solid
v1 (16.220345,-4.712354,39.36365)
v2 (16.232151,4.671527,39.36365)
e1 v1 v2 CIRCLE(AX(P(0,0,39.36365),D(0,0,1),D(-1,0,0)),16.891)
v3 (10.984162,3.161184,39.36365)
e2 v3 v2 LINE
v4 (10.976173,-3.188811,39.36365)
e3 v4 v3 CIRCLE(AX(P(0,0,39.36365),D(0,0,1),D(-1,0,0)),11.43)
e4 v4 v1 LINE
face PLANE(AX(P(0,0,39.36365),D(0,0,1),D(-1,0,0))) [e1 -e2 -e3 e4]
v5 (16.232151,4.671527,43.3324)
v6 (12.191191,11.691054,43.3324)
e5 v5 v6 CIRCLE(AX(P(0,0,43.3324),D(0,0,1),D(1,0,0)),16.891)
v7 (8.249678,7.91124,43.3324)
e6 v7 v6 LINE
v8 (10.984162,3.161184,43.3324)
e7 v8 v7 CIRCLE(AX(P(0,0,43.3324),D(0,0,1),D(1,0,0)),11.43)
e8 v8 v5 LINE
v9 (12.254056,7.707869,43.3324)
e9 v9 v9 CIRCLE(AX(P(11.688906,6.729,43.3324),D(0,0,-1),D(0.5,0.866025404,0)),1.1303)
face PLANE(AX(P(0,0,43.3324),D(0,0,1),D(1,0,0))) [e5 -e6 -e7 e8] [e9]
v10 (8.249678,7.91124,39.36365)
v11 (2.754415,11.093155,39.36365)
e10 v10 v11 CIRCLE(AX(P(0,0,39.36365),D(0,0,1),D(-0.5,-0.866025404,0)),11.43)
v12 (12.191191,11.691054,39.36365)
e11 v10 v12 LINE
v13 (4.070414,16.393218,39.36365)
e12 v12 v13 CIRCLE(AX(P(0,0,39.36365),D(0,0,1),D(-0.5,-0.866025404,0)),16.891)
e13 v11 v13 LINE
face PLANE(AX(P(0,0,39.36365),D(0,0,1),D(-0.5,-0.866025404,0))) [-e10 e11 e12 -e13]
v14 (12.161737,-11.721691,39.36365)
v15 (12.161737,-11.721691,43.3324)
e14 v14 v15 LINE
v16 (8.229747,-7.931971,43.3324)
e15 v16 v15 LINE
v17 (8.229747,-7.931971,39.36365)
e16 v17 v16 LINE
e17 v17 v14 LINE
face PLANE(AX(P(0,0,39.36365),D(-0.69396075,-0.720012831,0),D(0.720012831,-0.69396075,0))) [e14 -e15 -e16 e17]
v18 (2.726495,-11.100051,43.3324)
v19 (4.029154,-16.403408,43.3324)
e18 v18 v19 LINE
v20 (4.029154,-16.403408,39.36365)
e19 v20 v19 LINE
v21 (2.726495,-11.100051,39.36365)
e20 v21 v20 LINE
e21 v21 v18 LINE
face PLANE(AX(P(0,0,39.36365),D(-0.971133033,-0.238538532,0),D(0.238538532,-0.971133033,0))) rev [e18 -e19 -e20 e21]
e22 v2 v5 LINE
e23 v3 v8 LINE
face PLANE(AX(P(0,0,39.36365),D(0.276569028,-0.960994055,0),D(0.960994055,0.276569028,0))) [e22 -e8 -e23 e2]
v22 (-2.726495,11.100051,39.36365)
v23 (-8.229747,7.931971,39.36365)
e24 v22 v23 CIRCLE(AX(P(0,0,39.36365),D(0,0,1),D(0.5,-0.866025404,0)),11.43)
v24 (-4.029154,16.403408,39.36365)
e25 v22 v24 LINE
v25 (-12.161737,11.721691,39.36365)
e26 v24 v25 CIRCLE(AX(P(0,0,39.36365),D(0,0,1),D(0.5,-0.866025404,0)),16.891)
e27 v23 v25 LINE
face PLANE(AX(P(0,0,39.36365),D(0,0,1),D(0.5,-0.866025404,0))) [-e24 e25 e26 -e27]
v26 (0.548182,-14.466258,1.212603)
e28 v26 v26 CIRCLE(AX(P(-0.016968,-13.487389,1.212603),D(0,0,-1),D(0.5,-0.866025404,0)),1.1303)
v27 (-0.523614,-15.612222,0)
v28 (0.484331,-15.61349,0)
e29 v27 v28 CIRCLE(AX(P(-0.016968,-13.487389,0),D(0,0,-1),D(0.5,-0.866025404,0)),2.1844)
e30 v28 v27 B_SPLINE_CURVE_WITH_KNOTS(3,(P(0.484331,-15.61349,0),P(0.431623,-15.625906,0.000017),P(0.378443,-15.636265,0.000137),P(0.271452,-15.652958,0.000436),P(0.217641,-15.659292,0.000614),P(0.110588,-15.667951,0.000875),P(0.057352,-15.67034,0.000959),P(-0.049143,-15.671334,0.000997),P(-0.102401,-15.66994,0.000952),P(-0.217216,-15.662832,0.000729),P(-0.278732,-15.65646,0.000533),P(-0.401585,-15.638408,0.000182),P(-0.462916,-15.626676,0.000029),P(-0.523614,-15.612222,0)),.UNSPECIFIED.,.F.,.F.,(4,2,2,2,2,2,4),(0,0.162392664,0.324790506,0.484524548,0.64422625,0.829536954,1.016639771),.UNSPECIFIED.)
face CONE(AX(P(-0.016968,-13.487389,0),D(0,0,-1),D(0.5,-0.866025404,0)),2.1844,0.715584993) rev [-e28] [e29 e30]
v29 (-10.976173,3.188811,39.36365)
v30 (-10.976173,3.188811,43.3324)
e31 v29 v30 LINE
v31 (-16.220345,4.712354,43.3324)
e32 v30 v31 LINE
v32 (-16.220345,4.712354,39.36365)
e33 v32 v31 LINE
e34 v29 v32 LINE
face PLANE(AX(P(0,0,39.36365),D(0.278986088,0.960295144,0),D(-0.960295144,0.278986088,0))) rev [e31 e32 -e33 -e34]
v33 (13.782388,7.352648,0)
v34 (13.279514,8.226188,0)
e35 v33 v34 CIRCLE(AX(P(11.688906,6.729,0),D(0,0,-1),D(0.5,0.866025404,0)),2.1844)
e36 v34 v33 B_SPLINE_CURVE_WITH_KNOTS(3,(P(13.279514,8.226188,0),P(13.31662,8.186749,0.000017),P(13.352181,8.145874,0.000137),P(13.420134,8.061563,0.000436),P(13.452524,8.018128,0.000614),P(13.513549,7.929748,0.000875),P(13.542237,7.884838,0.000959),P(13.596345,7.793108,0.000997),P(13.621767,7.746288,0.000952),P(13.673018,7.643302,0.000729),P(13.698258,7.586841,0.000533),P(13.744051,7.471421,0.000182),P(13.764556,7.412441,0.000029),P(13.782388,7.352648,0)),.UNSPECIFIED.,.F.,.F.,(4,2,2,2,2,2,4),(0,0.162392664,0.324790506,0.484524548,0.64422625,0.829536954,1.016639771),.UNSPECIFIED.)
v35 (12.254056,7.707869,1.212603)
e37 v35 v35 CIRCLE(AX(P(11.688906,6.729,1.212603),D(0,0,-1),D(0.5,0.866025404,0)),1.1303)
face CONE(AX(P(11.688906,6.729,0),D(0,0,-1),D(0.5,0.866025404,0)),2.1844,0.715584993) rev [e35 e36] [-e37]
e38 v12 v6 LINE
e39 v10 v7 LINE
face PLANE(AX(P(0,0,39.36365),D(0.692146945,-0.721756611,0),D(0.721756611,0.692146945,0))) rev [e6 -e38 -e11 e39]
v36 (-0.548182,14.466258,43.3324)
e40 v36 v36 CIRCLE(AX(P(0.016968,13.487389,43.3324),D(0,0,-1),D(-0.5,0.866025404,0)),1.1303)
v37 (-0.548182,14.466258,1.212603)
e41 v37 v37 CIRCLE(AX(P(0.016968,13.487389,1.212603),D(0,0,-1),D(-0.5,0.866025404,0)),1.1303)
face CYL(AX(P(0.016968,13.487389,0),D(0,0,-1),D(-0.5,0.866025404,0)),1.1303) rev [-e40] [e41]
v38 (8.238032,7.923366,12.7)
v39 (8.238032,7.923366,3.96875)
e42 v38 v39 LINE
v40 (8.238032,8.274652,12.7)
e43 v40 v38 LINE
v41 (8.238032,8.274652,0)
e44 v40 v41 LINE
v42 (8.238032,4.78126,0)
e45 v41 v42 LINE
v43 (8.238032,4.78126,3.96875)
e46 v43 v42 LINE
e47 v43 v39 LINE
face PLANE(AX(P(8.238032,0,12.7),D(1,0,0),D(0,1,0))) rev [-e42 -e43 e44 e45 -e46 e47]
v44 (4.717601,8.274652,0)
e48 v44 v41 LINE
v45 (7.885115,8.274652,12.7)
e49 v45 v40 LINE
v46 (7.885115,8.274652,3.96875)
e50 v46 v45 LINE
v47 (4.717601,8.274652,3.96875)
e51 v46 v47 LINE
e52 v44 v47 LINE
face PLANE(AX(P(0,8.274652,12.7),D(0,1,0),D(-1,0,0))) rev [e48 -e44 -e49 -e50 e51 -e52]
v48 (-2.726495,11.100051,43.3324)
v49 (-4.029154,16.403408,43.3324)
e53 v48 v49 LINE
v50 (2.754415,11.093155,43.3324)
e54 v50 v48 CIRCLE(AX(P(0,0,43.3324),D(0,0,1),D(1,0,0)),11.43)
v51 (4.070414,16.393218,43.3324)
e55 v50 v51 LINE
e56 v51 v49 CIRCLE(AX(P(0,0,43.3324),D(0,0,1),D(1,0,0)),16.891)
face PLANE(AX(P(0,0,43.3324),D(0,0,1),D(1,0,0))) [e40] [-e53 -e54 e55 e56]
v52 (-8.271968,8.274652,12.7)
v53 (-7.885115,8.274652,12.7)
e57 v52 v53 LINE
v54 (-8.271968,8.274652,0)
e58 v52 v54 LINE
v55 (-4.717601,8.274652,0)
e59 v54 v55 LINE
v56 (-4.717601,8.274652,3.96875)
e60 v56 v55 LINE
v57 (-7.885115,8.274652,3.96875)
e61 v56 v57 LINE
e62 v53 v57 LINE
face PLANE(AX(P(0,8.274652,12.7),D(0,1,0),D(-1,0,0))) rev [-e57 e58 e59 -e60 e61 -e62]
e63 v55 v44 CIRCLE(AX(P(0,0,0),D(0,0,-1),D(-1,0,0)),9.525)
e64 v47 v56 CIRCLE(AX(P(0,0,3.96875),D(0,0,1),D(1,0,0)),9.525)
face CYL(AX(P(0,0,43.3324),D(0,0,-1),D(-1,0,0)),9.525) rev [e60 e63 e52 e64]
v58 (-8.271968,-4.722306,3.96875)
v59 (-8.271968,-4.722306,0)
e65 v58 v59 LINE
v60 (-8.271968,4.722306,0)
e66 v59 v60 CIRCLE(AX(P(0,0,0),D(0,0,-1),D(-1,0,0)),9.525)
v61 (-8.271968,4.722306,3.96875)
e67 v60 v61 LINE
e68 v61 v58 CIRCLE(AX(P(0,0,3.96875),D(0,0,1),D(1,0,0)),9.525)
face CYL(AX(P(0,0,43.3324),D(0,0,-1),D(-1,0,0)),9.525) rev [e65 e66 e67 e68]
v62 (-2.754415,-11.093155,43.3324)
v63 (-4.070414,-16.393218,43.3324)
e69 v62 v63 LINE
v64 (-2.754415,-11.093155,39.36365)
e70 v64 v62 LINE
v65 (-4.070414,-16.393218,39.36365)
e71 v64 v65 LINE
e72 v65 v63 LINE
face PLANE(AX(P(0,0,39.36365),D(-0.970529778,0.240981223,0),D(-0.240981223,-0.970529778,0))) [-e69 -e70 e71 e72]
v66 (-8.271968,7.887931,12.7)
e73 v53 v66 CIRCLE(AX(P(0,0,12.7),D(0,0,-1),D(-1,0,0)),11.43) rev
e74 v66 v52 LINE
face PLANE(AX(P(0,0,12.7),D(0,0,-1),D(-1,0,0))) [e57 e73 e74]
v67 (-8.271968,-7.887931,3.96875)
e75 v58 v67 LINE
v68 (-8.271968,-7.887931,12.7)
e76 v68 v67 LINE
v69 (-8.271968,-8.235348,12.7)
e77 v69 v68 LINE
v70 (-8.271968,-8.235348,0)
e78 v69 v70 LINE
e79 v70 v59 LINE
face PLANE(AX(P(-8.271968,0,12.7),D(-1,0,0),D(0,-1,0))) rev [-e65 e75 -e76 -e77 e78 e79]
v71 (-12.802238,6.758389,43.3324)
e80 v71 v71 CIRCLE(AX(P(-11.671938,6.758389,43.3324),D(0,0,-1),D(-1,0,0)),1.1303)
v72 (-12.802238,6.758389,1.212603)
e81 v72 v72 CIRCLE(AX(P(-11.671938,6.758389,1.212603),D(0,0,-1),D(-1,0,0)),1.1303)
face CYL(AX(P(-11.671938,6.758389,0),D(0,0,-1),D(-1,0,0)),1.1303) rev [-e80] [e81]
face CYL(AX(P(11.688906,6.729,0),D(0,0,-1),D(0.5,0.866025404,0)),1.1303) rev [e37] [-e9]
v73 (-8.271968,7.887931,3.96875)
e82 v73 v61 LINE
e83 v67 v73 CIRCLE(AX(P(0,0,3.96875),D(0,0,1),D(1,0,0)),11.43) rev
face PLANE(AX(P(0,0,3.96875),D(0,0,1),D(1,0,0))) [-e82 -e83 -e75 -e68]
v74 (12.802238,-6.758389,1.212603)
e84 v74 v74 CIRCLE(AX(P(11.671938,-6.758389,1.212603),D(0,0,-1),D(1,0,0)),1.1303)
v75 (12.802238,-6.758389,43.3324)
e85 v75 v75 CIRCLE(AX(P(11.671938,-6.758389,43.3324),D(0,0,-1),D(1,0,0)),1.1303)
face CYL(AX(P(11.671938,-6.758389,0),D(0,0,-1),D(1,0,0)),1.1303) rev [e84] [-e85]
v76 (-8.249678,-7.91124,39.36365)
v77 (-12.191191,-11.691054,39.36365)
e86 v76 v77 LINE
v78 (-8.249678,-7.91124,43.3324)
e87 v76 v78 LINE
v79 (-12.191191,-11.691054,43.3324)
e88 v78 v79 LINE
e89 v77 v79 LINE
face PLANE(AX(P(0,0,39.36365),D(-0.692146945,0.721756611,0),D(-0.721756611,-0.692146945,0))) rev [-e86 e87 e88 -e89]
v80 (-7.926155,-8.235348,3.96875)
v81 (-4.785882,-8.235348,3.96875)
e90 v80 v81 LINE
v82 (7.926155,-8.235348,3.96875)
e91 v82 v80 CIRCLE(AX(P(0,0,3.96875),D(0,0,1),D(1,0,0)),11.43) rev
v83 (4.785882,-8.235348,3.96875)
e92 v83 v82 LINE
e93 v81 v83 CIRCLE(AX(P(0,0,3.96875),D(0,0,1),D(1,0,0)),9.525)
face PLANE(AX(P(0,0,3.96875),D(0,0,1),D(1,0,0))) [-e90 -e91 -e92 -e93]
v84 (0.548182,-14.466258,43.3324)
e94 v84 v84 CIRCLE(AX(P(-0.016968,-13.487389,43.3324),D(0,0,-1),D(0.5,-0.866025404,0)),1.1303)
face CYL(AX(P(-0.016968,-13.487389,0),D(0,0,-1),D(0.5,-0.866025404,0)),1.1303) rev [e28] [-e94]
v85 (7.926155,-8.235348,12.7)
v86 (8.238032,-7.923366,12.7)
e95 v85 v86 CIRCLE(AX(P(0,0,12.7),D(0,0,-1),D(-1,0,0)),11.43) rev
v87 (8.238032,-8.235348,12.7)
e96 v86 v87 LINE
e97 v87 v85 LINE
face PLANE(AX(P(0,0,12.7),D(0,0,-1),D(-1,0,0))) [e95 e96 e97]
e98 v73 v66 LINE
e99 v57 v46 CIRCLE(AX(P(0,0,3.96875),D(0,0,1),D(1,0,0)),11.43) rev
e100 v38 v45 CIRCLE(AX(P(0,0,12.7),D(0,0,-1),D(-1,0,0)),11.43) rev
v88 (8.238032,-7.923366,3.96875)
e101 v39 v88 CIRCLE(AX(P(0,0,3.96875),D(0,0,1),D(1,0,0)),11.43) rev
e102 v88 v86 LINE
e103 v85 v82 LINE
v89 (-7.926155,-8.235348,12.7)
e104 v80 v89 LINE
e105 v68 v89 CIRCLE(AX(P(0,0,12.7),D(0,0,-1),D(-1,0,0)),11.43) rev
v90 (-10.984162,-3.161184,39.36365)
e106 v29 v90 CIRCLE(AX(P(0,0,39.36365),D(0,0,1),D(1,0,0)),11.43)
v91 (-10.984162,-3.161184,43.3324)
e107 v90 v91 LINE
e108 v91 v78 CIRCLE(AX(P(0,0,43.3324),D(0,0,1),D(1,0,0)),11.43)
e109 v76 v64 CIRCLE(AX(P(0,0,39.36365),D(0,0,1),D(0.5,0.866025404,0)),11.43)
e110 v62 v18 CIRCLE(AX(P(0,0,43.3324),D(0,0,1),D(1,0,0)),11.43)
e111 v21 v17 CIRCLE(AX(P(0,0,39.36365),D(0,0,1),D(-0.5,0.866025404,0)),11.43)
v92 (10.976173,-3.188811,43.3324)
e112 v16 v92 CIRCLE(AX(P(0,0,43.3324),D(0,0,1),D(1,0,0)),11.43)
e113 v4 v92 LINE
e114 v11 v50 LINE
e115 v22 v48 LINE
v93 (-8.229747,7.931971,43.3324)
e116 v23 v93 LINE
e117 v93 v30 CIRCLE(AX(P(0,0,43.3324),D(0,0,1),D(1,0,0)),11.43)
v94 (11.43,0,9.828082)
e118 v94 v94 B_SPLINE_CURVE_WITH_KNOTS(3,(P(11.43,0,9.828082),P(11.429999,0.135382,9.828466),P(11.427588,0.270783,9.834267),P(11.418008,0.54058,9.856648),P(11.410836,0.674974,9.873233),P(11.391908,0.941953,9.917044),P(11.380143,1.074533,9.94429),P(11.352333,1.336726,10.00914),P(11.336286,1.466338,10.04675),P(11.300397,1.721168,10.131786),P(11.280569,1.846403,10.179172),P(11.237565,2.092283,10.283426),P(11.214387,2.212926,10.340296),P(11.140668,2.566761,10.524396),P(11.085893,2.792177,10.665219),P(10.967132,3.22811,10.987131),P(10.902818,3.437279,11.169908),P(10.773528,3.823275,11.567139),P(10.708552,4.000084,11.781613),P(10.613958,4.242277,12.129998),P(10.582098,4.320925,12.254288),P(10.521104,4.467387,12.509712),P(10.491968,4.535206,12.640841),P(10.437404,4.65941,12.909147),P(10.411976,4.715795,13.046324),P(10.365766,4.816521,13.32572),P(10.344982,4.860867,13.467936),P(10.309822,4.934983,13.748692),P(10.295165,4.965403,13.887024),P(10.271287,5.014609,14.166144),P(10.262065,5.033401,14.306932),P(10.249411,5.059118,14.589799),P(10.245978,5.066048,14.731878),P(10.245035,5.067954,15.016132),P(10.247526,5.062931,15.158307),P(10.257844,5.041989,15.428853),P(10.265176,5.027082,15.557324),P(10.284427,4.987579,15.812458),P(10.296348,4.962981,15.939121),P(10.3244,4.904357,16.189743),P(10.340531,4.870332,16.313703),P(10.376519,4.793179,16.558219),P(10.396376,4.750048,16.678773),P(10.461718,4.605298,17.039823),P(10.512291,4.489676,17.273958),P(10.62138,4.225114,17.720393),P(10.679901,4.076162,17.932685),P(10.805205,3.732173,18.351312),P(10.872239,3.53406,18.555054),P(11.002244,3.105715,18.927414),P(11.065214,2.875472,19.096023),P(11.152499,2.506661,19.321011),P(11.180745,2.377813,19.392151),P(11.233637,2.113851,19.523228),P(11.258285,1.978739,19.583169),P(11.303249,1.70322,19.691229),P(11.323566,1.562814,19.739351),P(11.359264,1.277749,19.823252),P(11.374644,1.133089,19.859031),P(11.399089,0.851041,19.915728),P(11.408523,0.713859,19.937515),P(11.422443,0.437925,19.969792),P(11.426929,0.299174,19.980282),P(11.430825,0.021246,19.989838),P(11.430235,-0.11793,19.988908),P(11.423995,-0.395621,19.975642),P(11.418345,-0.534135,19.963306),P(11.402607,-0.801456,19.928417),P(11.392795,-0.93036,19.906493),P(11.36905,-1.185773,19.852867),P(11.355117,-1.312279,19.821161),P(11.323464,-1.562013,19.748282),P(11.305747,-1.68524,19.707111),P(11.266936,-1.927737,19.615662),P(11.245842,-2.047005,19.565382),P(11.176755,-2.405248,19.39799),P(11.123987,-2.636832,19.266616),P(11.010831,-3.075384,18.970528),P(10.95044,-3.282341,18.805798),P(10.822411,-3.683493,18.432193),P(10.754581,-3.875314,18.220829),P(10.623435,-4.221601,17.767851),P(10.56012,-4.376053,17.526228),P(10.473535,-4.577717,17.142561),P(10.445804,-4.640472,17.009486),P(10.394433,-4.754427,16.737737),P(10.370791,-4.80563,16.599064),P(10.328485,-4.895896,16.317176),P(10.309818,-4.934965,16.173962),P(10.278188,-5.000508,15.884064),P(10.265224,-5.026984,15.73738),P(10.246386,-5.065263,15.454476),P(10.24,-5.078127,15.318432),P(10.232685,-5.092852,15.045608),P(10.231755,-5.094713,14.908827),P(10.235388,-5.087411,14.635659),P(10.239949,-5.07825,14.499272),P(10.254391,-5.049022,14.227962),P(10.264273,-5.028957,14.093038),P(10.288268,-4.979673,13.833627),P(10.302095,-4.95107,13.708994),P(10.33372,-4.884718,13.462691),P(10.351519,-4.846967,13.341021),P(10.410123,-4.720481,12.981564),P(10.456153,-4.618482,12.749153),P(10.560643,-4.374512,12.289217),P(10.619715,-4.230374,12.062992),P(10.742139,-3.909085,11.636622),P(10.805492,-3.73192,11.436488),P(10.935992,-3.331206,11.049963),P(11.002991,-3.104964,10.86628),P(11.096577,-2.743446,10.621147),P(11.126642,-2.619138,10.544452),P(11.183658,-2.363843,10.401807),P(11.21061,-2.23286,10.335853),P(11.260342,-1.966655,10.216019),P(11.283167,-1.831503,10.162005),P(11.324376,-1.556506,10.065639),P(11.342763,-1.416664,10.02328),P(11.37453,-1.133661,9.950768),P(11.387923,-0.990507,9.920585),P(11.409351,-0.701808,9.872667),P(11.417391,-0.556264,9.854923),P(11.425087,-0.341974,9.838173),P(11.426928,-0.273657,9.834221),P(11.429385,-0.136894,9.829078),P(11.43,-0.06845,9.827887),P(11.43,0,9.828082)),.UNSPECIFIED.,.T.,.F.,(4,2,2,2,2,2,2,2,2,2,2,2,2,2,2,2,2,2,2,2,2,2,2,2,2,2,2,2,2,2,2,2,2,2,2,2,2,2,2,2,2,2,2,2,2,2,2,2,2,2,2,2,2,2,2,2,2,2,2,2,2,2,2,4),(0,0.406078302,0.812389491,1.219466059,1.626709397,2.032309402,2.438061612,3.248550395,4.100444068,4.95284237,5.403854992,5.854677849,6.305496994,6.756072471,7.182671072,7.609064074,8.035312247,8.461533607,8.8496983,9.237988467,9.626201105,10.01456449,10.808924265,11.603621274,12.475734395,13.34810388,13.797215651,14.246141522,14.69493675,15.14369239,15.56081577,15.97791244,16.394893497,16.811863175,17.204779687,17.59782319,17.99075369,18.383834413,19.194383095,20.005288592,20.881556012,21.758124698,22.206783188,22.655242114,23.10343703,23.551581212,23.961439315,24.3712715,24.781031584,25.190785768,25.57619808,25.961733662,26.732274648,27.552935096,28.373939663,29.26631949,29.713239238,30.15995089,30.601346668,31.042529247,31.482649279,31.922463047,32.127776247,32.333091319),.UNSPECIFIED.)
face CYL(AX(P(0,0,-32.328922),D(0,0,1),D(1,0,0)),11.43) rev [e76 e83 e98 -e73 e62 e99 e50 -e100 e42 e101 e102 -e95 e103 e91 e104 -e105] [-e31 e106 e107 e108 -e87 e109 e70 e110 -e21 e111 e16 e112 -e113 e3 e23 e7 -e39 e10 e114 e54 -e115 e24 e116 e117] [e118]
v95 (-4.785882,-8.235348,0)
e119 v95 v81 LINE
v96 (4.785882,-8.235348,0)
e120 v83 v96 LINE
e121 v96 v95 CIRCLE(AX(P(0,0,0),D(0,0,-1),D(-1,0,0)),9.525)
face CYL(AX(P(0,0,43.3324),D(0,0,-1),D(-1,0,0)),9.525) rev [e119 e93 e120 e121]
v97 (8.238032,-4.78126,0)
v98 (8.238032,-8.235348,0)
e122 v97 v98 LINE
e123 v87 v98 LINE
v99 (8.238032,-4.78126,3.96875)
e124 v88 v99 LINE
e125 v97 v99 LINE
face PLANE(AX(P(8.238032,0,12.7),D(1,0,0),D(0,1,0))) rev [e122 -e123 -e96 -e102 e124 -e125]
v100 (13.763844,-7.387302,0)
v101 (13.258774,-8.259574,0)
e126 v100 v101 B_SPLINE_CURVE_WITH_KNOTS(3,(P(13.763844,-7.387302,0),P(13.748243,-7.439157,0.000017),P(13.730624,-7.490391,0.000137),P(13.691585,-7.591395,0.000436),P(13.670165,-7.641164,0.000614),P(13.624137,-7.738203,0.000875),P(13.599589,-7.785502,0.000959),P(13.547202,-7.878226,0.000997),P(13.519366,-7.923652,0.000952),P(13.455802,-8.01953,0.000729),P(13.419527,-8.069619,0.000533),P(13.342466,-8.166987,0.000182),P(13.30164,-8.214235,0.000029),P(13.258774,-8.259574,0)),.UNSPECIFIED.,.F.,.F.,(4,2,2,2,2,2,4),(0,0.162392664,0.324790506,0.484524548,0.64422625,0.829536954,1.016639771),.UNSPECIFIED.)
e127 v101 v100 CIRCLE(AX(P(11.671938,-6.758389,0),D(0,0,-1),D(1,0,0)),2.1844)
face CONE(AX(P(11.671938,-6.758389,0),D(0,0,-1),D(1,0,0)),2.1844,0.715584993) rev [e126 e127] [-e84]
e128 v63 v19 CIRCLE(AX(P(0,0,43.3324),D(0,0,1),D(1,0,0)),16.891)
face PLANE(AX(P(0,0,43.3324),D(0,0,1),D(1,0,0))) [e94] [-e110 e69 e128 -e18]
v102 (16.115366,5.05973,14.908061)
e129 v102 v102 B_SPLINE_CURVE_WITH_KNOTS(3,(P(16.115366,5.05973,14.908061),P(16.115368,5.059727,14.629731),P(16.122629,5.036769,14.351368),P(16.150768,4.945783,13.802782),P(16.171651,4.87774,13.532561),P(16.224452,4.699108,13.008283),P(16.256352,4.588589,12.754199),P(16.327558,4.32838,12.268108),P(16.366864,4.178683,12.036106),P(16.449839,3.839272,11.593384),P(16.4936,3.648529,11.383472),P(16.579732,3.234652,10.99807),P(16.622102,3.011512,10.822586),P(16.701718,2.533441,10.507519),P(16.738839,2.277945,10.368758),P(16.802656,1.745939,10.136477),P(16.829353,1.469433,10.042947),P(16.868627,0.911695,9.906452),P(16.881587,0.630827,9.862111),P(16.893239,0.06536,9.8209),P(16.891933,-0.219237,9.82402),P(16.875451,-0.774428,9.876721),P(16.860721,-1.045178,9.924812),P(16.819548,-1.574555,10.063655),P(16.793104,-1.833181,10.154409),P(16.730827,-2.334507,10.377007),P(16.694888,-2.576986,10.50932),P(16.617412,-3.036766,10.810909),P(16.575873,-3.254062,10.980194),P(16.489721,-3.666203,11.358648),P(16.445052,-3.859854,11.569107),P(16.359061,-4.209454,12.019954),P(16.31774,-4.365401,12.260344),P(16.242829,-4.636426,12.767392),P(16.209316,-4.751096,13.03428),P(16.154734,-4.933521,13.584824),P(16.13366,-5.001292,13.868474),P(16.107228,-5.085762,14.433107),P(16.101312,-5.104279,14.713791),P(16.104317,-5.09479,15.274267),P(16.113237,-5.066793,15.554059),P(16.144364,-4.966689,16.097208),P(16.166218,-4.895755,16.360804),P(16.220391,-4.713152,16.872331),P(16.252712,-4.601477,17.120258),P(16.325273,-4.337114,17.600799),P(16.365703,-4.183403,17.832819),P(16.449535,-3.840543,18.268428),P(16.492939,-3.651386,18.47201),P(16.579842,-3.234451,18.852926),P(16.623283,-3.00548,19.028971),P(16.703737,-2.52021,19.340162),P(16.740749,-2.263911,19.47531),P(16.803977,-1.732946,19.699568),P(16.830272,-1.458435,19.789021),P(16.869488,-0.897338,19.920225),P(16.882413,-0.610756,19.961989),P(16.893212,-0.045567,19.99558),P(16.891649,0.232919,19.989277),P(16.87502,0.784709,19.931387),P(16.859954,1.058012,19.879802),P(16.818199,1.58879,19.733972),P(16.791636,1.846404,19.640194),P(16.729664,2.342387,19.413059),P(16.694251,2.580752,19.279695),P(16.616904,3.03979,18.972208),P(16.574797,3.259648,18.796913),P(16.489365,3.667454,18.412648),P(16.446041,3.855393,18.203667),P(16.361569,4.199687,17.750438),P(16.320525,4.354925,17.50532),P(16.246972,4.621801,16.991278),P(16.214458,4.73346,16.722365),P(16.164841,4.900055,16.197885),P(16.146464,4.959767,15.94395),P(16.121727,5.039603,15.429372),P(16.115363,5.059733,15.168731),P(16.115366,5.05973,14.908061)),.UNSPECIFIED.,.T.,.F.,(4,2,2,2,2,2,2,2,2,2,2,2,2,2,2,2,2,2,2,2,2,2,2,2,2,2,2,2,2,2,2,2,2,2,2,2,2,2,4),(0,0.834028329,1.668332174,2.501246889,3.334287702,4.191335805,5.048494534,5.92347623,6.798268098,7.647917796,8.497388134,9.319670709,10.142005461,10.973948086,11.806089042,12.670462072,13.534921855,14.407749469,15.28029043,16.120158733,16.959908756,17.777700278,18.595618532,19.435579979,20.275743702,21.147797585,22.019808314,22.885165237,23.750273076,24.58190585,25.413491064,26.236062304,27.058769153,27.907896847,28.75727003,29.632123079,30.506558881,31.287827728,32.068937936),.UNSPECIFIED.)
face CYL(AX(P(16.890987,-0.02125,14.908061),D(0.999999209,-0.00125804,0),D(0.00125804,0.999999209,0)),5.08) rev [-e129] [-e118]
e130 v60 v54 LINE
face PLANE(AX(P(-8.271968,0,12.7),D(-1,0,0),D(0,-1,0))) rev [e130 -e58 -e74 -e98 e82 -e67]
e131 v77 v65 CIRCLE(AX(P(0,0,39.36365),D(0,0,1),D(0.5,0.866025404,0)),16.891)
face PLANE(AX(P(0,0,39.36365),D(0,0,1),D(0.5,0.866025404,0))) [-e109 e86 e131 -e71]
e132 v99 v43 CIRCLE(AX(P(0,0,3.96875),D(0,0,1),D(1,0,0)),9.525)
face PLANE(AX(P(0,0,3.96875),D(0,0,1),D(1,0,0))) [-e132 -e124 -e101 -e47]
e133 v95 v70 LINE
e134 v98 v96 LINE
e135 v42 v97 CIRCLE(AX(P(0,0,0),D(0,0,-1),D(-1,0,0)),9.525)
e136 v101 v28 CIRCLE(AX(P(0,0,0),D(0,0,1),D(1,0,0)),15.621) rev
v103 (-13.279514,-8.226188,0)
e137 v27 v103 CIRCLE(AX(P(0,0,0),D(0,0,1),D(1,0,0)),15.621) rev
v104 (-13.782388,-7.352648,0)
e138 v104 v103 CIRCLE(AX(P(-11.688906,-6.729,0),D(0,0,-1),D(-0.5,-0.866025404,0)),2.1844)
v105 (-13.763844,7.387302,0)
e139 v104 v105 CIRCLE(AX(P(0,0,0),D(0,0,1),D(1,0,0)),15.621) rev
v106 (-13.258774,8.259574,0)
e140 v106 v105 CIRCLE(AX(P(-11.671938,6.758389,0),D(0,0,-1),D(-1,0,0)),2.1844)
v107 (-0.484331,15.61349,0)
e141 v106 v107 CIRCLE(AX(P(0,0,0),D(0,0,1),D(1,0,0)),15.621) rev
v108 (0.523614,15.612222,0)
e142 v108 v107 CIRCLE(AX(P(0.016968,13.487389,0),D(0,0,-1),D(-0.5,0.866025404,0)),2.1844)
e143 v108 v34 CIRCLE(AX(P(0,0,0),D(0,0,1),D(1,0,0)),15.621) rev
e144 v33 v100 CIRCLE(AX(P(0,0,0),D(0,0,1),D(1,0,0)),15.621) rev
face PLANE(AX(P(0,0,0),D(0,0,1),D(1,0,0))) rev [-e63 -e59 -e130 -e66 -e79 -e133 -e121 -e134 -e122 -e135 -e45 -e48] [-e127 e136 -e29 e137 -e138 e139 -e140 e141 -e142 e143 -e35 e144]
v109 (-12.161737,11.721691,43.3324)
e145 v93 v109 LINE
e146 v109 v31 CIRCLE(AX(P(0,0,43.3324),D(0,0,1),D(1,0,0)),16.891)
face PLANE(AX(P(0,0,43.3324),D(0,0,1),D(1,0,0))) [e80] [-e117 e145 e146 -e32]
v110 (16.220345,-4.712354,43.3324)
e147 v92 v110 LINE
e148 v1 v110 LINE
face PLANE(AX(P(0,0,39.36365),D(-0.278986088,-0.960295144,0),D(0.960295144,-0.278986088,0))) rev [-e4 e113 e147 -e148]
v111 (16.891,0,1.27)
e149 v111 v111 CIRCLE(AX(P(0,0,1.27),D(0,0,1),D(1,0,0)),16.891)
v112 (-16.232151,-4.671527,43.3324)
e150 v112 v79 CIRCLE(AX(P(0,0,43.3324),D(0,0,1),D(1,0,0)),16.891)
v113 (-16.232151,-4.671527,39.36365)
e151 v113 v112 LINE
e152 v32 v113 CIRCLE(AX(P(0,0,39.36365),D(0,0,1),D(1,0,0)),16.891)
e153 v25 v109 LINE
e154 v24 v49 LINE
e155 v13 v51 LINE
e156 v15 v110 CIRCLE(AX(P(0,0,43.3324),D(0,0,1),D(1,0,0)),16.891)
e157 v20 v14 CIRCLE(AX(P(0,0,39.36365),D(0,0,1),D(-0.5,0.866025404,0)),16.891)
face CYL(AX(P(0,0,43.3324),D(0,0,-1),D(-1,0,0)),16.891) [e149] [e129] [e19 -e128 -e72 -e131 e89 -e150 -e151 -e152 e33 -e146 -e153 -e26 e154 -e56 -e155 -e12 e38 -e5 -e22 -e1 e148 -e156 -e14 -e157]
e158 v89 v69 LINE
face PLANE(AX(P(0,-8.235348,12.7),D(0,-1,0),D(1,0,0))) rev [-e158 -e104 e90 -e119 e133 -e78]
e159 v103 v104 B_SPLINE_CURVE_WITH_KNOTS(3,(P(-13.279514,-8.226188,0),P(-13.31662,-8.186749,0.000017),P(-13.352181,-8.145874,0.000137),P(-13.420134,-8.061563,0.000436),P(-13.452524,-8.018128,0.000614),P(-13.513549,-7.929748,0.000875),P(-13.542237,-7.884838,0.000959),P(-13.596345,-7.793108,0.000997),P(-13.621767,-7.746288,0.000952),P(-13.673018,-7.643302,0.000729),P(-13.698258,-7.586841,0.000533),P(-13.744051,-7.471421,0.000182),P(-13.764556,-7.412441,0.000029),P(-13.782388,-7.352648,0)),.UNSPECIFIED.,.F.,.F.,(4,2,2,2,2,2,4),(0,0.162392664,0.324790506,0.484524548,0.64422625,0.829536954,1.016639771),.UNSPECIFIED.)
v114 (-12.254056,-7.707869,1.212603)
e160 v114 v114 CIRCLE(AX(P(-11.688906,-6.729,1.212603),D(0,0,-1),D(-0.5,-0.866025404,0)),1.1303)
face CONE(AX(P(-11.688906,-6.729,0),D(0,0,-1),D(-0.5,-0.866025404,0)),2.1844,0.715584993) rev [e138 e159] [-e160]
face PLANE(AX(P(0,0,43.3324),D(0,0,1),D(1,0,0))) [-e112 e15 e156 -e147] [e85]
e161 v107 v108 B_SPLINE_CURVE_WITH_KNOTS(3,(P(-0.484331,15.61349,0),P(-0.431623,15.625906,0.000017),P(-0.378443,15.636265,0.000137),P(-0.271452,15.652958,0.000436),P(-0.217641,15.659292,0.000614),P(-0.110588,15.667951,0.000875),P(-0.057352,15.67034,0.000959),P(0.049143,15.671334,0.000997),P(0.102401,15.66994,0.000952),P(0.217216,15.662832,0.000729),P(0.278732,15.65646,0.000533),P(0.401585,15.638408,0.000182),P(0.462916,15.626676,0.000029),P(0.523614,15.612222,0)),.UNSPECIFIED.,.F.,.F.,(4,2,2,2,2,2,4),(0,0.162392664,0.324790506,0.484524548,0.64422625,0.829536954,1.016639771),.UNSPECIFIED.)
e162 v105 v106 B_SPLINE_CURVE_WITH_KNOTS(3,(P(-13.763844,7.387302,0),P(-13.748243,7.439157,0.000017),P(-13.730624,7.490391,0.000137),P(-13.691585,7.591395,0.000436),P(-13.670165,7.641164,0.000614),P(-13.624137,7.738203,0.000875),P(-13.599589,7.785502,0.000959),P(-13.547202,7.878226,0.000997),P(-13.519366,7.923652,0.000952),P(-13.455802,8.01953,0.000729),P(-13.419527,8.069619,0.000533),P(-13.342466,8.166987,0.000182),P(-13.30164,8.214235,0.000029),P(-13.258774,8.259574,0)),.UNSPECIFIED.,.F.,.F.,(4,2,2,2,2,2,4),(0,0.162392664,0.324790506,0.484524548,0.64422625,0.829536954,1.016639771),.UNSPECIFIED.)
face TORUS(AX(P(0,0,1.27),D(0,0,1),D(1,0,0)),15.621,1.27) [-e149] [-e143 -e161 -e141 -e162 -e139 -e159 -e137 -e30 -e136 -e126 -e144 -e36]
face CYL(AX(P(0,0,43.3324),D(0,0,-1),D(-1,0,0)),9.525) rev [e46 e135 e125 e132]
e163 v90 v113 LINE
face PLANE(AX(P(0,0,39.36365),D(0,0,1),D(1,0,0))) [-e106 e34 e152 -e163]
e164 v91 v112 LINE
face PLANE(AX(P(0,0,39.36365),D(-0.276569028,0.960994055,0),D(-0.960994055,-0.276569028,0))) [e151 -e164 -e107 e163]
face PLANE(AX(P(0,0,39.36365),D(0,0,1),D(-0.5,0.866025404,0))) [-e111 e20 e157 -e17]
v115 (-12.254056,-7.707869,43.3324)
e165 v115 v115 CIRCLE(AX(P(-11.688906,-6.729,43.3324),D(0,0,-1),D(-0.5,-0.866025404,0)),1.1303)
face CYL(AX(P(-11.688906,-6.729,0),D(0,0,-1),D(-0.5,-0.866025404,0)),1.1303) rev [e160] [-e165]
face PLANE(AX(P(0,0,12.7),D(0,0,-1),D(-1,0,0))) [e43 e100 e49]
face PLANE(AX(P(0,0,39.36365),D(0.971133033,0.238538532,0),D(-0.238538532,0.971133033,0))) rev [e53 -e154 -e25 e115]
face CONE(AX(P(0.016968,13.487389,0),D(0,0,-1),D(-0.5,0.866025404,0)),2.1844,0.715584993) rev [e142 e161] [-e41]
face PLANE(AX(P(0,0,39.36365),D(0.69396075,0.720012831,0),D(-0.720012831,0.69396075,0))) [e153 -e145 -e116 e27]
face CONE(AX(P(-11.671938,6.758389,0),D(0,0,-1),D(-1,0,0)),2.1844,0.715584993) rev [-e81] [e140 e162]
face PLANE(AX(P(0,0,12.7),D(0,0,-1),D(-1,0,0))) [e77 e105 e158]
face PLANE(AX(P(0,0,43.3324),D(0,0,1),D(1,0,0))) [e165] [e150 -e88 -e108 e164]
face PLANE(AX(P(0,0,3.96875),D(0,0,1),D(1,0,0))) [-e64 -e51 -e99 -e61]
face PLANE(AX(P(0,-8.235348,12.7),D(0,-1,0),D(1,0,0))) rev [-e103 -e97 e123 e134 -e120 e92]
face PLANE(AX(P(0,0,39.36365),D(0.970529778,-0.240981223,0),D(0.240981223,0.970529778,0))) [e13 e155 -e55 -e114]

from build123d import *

# Parameters (mm, degrees)
SKETCH1_R                                      = 16.891
BOSS_EXTRUDE1_DEPTH                            = 43.3324
SKETCH9_R                                      = 9.525
CUT_EXTRUDE6_DEPTH                             = 50.480386536
SKETCH10_R                                     = 11.43
BOSS_EXTRUDE2_DEPTH                            = 19.05
CUT_EXTRUDE7_START                             = -39.36365
SKETCH11_R                                     = 9.525
CUT_EXTRUDE7_DEPTH                             = 39.36365
CUT_EXTRUDE8_START                             = -3.96875
CUT_EXTRUDE8_DEPTH                             = 3.96875
CSK_FOR_2_FLAT_HEAD_MACHINE_SCREW1_D           = 2.2606
CSK_FOR_2_FLAT_HEAD_MACHINE_SCREW1_CSINK_D     = 4.3688
CSK_FOR_2_FLAT_HEAD_MACHINE_SCREW1_CSINK_ANGLE = 82
CIRPATTERN1_COUNT                              = 6
F_1_2_0_4_DIAMETER_HOLE1_D                     = 10.16
F_1_2_0_4_DIAMETER_HOLE1_DEPTH                 = 12.7
F_1_2_0_4_DIAMETER_HOLE1_TIP                   = 3.052371945
FILLET1_R                                      = 1.27
SKETCH16_W                                     = 16.51
SKETCH16_H                                     = 16.51
CUT_EXTRUDE9_DEPTH                             = 12.7


with BuildPart() as part:
    # Sketch1 → Boss-Extrude1 (new body)
    with BuildSketch(Plane.XY):
        Circle(SKETCH1_R)
    extrude(amount=BOSS_EXTRUDE1_DEPTH)

    # Sketch9 → Cut-Extrude6 (cut, through all)
    with BuildSketch(Plane(origin=(0, 0, 0), x_dir=(-1, 0, 0), z_dir=(0, 0, -1))):
        Circle(SKETCH9_R)
        with BuildLine():
            ThreePointArc((-5.359640753, -7.874), (0, -9.525), (5.359640753, -7.874))
            Line((5.359640753, -7.874), (-5.359640753, -7.874))
        make_face()
        with BuildLine():
            ThreePointArc((-7.874, 5.359640753), (-9.525, 0), (-7.874, -5.359640753))
            Line((-7.874, -5.359640753), (-7.874, 5.359640753))
        make_face()
        with BuildLine():
            Line((-5.359640753, 7.874), (5.359640753, 7.874))
            ThreePointArc((5.359640753, 7.874), (0, 9.525), (-5.359640753, 7.874))
        make_face()
        with BuildLine():
            Line((7.874, 5.359640753), (7.874, -5.359640753))
            ThreePointArc((7.874, -5.359640753), (9.102897204, -2.804084075), (9.525, 0))
            ThreePointArc((9.525, 0), (9.102897204, 2.804084075), (7.874, 5.359640753))
        make_face()
    extrude(amount=-CUT_EXTRUDE6_DEPTH, mode=Mode.SUBTRACT)

    # Sketch10 → Boss-Extrude2 (add)
    # profile 1 of 2: a face of its own
    with BuildSketch(Plane(origin=(0, 0, 0), x_dir=(-1, 0, 0), z_dir=(0, 0, -1))):
        Circle(SKETCH10_R)
        with BuildLine():
            ThreePointArc((-5.359640753, -7.874), (-4.453933477, 8.419507206), (9.525, 0))
            ThreePointArc((9.525, 0), (8.419507206, -4.453933477), (5.359640753, -7.874))
            ThreePointArc((5.359640753, -7.874), (0, -9.525), (-5.359640753, -7.874))
        make_face(mode=Mode.SUBTRACT)
    # profile 2 of 2: a face of its own
    with BuildSketch(Plane(origin=(0, 0, 0), x_dir=(-1, 0, 0), z_dir=(0, 0, -1))):
        Circle(SKETCH10_R)
        with BuildLine():
            ThreePointArc((-5.359640753, -7.874), (-4.453933477, 8.419507206), (9.525, 0))
            ThreePointArc((9.525, 0), (8.419507206, -4.453933477), (5.359640753, -7.874))
            ThreePointArc((5.359640753, -7.874), (0, -9.525), (-5.359640753, -7.874))
        make_face(mode=Mode.SUBTRACT)
    extrude(amount=-BOSS_EXTRUDE2_DEPTH)

    # Sketch11 → Cut-Extrude7 (cut)
    with BuildSketch(Plane.XY.offset(43.3324).offset(CUT_EXTRUDE7_START)):
        with BuildLine():
            Line((-9.153468369, -2.634319991), (-10.984162043, -3.161183989))
            ThreePointArc((-10.984162043, -3.161183989), (1.596234295, -11.317991698), (11.43, 0))
            ThreePointArc((11.43, 0), (1.610471515, 11.315974615), (-10.976173491, 3.188810986))
            Line((-10.976173491, 3.188810986), (-9.146811242, 2.657342489))
            ThreePointArc((-9.146811242, 2.657342489), (1.342059596, 9.429978846), (9.525, 0))
            ThreePointArc((9.525, 0), (1.330195246, -9.431659748), (-9.153468369, -2.634319991))
        make_face()
        with Locations(Location((0, 0, 0), (0, 0, 180))):
            Circle(SKETCH11_R)
        with BuildLine():
            ThreePointArc((-10.984162043, -3.161183989), (-11.297244321, 0.014212394), (-10.976173491, 3.188810986))
            Line((-10.976173491, 3.188810986), (0, 0))
            Line((0, 0), (-10.984162043, -3.161183989))
        make_face()
        with BuildLine():
            ThreePointArc((-10.976173491, 3.188810986), (-11.429990955, 0.014379395), (-10.984162043, -3.161183989))
            ThreePointArc((-10.984162043, -3.161183989), (-11.297244321, 0.014212394), (-10.976173491, 3.188810986))
        make_face()
    extrude(amount=CUT_EXTRUDE7_DEPTH, mode=Mode.SUBTRACT)

    # Sketch11<4> → Cut-Extrude8 (cut)
    with BuildSketch(Plane.XY.offset(43.3324).offset(CUT_EXTRUDE8_START)):
        with BuildLine():
            ThreePointArc((-10.976173491, 3.188810986), (-11.297244321, 0.014212394), (-10.984162043, -3.161183989))
            Line((-10.984162043, -3.161183989), (0, 0))
            Line((0, 0), (-10.976173491, 3.188810986))
        make_face()
        with BuildLine():
            ThreePointArc((-10.976173491, 3.188810986), (-11.429990955, 0.014379395), (-10.984162043, -3.161183989))
            ThreePointArc((-10.984162043, -3.161183989), (-11.297244321, 0.014212394), (-10.976173491, 3.188810986))
        make_face()
        with BuildLine():
            Line((-16.232150575, -4.67152745), (-10.984162043, -3.161183989))
            ThreePointArc((-10.984162043, -3.161183989), (-11.429990955, 0.014379395), (-10.976173491, 3.188810986))
            Line((-10.976173491, 3.188810986), (-16.220345269, 4.712354013))
            ThreePointArc((-16.220345269, 4.712354013), (-16.925737574, 0.021293268), (-16.232150575, -4.67152745))
        make_face()
        with BuildLine():
            Line((0, 0), (-10.984162043, -3.161183989))
            ThreePointArc((-10.984162043, -3.161183989), (1.596234295, -11.317991698), (11.43, 0))
            ThreePointArc((11.43, 0), (1.610471515, 11.315974615), (-10.976173491, 3.188810986))
            Line((-10.976173491, 3.188810986), (0, 0))
        make_face()
    cut_extrude8 = extrude(amount=CUT_EXTRUDE8_DEPTH, mode=Mode.SUBTRACT)

    # CSK for #2 Flat Head Machine Screw1 (through all)
    with Locations(Plane(origin=(0, 0, 0), x_dir=(-1, 0, 0), z_dir=(0, 0, -1))):
        with Locations((11.671937945, 6.75838911)):
            csk_for_2_flat_head_machine_screw1 = CounterSinkHole(CSK_FOR_2_FLAT_HEAD_MACHINE_SCREW1_D / 2, CSK_FOR_2_FLAT_HEAD_MACHINE_SCREW1_CSINK_D / 2, counter_sink_angle=CSK_FOR_2_FLAT_HEAD_MACHINE_SCREW1_CSINK_ANGLE)

    # CirPattern1: Cut-Extrude8, CSK for #2 Flat Head Machine Screw1 ×6 about axis
    cirpattern1_axis = Axis((0, 0, 0), (0, 0, 1))
    add([cut_extrude8.rotate(cirpattern1_axis, i * 360 / CIRPATTERN1_COUNT) for i in range(1, CIRPATTERN1_COUNT)], mode=Mode.SUBTRACT)
    add([csk_for_2_flat_head_machine_screw1.rotate(cirpattern1_axis, i * 360 / CIRPATTERN1_COUNT) for i in range(1, CIRPATTERN1_COUNT)], mode=Mode.SUBTRACT)

    # 1/2 (0.4) Diameter Hole1
    with Locations(Plane(origin=(16.890986634, -0.02124955, 14.908061188), x_dir=(0.001258039772, 0.999999208668, 0), z_dir=(0.999999208668, -0.001258039772, 0))):
        with Locations((0, 0)):
            Hole(F_1_2_0_4_DIAMETER_HOLE1_D / 2, depth=F_1_2_0_4_DIAMETER_HOLE1_DEPTH)
            with Locations((0, 0, -(F_1_2_0_4_DIAMETER_HOLE1_DEPTH + F_1_2_0_4_DIAMETER_HOLE1_TIP / 2))):  # 118° drill point
                Cone(0, F_1_2_0_4_DIAMETER_HOLE1_D / 2, F_1_2_0_4_DIAMETER_HOLE1_TIP, mode=Mode.SUBTRACT)

    # Fillet1
    # the kernel refuses this fillet: 1.27 mm, written as the material it takes off along each edge
    with BuildSketch(Plane(origin=(0, 0, 0), x_dir=(1, 0, 0), z_dir=(0, -1, 0))) as fillet1_piece_1:
        with BuildLine():
            CenterArc((16.891 - FILLET1_R, FILLET1_R), FILLET1_R, 270, 90)
            Line((16.891 - FILLET1_R, 0), (16.891, 0))
            Line((16.891, 0), (16.891, FILLET1_R))
        make_face()
    revolve(axis=Axis((0, 0, 0), (0, 0, 1)), mode=Mode.SUBTRACT)

    # Sketch16 → Cut-Extrude9 (cut)
    with BuildSketch(Plane(origin=(0, 0, 0), x_dir=(-1, 0, 0), z_dir=(0, 0, -1))):
        with Locations((0.016967686, 0.019651839)):
            Rectangle(SKETCH16_W, SKETCH16_H)
    extrude(amount=-CUT_EXTRUDE9_DEPTH, mode=Mode.SUBTRACT)


solid = part.part
